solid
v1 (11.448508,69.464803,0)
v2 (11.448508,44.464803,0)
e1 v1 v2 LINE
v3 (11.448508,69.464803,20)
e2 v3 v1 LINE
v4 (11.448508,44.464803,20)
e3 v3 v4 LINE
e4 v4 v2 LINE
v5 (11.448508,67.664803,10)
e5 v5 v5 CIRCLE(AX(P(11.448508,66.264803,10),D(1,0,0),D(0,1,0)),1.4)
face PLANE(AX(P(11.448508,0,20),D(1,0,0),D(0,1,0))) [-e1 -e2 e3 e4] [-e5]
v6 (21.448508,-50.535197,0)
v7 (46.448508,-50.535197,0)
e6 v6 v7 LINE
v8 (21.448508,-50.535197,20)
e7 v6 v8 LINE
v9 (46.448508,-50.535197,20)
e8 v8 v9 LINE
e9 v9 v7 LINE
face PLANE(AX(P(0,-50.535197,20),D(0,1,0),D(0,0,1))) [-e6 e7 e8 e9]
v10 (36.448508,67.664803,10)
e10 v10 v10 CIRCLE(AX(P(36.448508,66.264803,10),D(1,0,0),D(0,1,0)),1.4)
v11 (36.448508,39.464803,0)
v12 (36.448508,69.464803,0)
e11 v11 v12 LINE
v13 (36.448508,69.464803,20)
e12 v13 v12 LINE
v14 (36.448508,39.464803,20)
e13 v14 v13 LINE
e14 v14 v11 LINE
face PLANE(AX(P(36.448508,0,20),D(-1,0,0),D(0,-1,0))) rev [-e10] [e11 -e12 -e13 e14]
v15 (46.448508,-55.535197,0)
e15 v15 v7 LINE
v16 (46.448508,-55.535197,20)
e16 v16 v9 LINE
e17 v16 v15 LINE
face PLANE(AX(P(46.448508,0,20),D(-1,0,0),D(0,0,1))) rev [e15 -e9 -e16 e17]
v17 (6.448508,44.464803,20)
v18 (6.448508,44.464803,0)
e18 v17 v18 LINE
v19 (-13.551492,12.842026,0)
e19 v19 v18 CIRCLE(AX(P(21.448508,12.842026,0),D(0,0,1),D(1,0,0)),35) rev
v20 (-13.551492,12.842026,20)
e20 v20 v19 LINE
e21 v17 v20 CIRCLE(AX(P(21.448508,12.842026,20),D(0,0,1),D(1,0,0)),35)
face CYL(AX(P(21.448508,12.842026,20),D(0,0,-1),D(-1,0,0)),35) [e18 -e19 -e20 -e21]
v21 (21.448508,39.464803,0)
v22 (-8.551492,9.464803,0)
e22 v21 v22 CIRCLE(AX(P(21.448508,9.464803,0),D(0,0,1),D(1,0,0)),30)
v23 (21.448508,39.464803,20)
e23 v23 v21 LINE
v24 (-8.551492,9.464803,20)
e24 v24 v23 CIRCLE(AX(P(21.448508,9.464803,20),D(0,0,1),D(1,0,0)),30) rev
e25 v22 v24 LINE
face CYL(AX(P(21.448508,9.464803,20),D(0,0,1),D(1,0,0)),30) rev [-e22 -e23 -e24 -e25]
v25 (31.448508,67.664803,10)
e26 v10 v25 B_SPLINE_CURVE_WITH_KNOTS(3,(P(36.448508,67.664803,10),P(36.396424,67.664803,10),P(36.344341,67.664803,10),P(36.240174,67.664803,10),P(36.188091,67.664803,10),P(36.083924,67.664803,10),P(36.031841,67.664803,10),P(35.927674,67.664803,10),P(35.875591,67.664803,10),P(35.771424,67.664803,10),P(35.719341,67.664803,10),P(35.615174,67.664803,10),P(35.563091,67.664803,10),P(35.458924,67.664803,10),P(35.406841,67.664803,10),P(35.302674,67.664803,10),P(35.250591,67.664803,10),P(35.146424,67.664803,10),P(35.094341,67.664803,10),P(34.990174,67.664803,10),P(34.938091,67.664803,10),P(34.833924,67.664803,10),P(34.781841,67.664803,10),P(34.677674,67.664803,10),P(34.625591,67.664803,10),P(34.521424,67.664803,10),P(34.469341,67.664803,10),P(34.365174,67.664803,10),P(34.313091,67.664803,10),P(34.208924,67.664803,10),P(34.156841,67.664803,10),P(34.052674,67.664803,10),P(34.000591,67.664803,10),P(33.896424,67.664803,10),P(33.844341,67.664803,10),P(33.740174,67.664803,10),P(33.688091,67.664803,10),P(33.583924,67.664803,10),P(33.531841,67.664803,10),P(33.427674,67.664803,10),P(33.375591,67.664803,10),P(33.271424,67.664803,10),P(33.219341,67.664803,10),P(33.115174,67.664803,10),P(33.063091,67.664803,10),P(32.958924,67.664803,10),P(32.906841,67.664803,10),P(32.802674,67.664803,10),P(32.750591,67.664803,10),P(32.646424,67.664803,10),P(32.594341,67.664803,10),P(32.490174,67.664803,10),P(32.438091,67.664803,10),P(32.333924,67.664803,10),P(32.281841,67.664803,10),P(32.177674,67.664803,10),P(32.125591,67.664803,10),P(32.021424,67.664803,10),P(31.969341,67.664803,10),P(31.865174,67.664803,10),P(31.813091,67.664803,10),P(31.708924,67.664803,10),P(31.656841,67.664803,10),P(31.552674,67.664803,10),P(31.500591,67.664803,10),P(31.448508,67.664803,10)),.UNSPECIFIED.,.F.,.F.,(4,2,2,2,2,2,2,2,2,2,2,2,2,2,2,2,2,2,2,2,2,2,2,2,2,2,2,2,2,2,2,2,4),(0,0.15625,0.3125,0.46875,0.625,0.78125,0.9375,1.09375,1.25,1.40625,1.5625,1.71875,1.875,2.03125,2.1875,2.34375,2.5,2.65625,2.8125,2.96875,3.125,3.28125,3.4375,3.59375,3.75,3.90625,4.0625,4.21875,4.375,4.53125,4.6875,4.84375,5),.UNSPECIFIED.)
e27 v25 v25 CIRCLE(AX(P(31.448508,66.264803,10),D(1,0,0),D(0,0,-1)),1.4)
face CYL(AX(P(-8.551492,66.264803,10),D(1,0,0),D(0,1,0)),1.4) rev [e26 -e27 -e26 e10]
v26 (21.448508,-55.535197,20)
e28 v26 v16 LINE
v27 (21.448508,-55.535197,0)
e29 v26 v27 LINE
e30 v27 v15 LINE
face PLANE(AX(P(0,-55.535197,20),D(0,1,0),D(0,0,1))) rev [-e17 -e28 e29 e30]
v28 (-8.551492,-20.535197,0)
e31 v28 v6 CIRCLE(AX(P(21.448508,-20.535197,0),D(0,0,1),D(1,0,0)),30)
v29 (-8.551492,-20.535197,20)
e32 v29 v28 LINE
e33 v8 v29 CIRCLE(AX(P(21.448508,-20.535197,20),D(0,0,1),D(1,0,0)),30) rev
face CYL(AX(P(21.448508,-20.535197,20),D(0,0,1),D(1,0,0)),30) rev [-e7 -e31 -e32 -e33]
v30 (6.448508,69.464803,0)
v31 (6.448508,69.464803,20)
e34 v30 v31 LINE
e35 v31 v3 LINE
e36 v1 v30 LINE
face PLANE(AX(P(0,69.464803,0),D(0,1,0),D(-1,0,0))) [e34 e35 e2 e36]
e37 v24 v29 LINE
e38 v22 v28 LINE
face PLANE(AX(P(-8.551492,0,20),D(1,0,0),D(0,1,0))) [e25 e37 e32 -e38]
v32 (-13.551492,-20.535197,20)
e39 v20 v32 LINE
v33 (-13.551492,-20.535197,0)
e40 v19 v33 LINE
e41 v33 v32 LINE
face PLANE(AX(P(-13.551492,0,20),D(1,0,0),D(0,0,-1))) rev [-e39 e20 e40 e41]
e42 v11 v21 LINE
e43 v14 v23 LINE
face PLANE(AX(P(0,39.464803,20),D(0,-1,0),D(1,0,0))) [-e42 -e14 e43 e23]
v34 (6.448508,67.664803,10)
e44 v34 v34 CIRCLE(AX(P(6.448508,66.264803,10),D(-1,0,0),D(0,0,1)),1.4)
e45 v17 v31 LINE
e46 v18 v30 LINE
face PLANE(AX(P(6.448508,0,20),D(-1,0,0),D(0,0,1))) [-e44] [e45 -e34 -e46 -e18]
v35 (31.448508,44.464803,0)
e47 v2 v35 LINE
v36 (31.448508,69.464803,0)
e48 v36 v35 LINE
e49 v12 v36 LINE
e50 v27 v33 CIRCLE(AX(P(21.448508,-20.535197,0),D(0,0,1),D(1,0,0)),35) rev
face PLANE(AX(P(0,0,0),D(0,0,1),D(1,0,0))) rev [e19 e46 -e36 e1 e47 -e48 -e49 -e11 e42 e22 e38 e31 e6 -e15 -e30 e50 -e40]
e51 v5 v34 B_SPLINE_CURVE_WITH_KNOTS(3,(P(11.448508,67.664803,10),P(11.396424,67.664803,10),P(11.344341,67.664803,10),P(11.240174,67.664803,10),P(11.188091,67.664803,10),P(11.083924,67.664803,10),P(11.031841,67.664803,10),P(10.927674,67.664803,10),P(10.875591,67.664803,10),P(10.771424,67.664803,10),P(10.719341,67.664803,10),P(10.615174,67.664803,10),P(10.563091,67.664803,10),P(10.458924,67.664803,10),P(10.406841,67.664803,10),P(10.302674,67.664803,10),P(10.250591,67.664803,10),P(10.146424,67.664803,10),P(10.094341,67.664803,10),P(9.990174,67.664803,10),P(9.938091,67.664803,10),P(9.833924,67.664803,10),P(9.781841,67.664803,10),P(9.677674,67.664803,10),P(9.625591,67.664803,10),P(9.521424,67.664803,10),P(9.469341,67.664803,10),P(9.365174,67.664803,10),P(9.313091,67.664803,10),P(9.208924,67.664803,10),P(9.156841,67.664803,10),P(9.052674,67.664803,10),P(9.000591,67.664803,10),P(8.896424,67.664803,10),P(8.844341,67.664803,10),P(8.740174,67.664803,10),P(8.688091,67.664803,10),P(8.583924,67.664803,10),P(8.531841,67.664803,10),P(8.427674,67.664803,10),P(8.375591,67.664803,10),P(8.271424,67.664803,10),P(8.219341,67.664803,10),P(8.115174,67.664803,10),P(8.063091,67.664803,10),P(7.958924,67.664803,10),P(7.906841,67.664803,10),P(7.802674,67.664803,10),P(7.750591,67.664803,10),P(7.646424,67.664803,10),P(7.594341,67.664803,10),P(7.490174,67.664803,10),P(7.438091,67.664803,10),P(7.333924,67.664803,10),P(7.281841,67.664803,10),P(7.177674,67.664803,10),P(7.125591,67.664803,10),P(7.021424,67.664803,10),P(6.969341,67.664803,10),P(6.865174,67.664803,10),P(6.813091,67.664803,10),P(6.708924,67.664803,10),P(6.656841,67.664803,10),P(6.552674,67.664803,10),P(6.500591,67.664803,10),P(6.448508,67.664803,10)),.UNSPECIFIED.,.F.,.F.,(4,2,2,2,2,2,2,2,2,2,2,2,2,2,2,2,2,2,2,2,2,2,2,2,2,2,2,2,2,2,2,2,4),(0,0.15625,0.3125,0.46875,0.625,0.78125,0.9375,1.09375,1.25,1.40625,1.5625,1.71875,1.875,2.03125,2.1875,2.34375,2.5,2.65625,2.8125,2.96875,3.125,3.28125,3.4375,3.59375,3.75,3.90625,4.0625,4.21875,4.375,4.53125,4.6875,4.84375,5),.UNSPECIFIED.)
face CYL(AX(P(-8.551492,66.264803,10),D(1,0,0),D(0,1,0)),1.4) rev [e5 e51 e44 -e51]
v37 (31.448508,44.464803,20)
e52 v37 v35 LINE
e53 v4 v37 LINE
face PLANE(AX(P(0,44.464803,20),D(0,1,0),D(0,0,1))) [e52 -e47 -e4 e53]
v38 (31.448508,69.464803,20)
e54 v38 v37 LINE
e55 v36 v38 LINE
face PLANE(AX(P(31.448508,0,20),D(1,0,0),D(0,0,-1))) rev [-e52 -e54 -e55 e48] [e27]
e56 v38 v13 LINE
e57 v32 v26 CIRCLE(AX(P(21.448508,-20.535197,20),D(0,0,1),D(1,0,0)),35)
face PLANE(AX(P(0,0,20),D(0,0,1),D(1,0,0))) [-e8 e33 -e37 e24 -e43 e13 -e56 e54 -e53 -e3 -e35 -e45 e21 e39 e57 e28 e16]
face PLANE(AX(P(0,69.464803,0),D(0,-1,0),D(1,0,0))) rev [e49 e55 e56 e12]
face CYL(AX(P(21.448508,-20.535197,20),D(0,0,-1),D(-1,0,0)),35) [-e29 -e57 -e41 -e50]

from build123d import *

# Parameters (mm, degrees)
BOSS_EXTRUDE1_DEPTH = 20
FILLET1_R           = 30
FILLET2_R           = 35
SKETCH2_W           = 5
SKETCH2_H           = 20
BOSS_EXTRUDE2_DEPTH = 15
SKETCH3_R           = 1.4
CUT_EXTRUDE1_DEPTH  = 45


with BuildPart() as part:
    # Sketch1 → Boss-Extrude1 (new body)
    with BuildSketch(Plane.XY):
        Polygon((11.448507825, 54.464802922), (6.448507825, 54.464802922), (6.448507825, 44.464802922), (-8.551492175, 44.464802922), (-13.551492175, 44.464802922), (-13.551492175, 39.464802922), (-13.551492175, -50.535197078), (-13.551492175, -55.535197078), (-8.551492175, -55.535197078), (46.448507825, -55.535197078), (46.448507825, -50.535197078), (-8.551492175, -50.535197078), (-8.551492175, 39.464802922), (6.448507825, 39.464802922), (36.448507825, 39.464802922), (36.448507825, 54.464802922), (31.448507825, 54.464802922), (31.448507825, 44.464802922), (11.448507825, 44.464802922), align=None)
    extrude(amount=BOSS_EXTRUDE1_DEPTH)

    # Fillet1
    fillet1_edges = [part.edges().sort_by_distance(p)[0] for p in [
        (-8.551492175, 39.464802922, 10),
        (-8.551492175, -50.535197078, 10),
    ]]
    fillet(fillet1_edges, radius=FILLET1_R)

    # Fillet2
    # the kernel refuses this fillet: 35 mm, written as the material it takes off along each edge
    with BuildSketch(Plane(origin=(-13.551492175, -55.535197078, -87.5), x_dir=(1, 0, 0), z_dir=(0, 0, 1))) as fillet2_piece_1:
        with BuildLine():
            CenterArc((FILLET2_R, FILLET2_R), FILLET2_R, 180, 90)
            Line((0, FILLET2_R), (-FILLET2_R * 0.02, FILLET2_R))
            Line((-FILLET2_R * 0.02, FILLET2_R), (-FILLET2_R * 0.02, -FILLET2_R * 0.02))
            Line((-FILLET2_R * 0.02, -FILLET2_R * 0.02), (FILLET2_R, -FILLET2_R * 0.02))
            Line((FILLET2_R, -FILLET2_R * 0.02), (FILLET2_R, 0))
        make_face()
    extrude(amount=195, mode=Mode.SUBTRACT)
    with BuildSketch(Plane(origin=(-13.551492175, 44.464802922, -79.056941504), x_dir=(0, -1, 0), z_dir=(0, 0, 1))) as fillet2_piece_2:
        with BuildLine():
            CenterArc((31.622776602, 35), FILLET2_R, 205.376933525, 64.623066475)
            Line((0, 20), (-0.632455532, 19.7))
            ThreePointArc((-0.632455532, 19.7), (-0.7, 10), (-0.7, 0))
            Line((-0.7, 0), (0, -0.7))
            Line((0, -0.7), (31.622776602, -0.7))
            Line((31.622776602, -0.7), (31.622776602, 0))
        make_face()
    extrude(amount=178.113883008, mode=Mode.SUBTRACT)

    # Sketch2 → Boss-Extrude2 (add)
    with BuildSketch(Plane(origin=(0, 54.464802922, 0), x_dir=(1, 0, 0), z_dir=(0, 1, 0))):
        with Locations((8.948507825, -10)):
            Rectangle(SKETCH2_W, SKETCH2_H)
        with Locations((33.948507825, -10)):
            Rectangle(SKETCH2_W, SKETCH2_H)
    extrude(amount=BOSS_EXTRUDE2_DEPTH)

    # Sketch3 → Cut-Extrude1 (cut)
    with BuildSketch(Plane(origin=(36.448507825, 0, 0), x_dir=(0, 0, -1), z_dir=(1, 0, 0))):
        with Locations(Location((-10, 66.264802922, 0), (0, 0, 90))):
            Circle(SKETCH3_R)
    extrude(amount=-CUT_EXTRUDE1_DEPTH, mode=Mode.SUBTRACT)


solid = part.part
